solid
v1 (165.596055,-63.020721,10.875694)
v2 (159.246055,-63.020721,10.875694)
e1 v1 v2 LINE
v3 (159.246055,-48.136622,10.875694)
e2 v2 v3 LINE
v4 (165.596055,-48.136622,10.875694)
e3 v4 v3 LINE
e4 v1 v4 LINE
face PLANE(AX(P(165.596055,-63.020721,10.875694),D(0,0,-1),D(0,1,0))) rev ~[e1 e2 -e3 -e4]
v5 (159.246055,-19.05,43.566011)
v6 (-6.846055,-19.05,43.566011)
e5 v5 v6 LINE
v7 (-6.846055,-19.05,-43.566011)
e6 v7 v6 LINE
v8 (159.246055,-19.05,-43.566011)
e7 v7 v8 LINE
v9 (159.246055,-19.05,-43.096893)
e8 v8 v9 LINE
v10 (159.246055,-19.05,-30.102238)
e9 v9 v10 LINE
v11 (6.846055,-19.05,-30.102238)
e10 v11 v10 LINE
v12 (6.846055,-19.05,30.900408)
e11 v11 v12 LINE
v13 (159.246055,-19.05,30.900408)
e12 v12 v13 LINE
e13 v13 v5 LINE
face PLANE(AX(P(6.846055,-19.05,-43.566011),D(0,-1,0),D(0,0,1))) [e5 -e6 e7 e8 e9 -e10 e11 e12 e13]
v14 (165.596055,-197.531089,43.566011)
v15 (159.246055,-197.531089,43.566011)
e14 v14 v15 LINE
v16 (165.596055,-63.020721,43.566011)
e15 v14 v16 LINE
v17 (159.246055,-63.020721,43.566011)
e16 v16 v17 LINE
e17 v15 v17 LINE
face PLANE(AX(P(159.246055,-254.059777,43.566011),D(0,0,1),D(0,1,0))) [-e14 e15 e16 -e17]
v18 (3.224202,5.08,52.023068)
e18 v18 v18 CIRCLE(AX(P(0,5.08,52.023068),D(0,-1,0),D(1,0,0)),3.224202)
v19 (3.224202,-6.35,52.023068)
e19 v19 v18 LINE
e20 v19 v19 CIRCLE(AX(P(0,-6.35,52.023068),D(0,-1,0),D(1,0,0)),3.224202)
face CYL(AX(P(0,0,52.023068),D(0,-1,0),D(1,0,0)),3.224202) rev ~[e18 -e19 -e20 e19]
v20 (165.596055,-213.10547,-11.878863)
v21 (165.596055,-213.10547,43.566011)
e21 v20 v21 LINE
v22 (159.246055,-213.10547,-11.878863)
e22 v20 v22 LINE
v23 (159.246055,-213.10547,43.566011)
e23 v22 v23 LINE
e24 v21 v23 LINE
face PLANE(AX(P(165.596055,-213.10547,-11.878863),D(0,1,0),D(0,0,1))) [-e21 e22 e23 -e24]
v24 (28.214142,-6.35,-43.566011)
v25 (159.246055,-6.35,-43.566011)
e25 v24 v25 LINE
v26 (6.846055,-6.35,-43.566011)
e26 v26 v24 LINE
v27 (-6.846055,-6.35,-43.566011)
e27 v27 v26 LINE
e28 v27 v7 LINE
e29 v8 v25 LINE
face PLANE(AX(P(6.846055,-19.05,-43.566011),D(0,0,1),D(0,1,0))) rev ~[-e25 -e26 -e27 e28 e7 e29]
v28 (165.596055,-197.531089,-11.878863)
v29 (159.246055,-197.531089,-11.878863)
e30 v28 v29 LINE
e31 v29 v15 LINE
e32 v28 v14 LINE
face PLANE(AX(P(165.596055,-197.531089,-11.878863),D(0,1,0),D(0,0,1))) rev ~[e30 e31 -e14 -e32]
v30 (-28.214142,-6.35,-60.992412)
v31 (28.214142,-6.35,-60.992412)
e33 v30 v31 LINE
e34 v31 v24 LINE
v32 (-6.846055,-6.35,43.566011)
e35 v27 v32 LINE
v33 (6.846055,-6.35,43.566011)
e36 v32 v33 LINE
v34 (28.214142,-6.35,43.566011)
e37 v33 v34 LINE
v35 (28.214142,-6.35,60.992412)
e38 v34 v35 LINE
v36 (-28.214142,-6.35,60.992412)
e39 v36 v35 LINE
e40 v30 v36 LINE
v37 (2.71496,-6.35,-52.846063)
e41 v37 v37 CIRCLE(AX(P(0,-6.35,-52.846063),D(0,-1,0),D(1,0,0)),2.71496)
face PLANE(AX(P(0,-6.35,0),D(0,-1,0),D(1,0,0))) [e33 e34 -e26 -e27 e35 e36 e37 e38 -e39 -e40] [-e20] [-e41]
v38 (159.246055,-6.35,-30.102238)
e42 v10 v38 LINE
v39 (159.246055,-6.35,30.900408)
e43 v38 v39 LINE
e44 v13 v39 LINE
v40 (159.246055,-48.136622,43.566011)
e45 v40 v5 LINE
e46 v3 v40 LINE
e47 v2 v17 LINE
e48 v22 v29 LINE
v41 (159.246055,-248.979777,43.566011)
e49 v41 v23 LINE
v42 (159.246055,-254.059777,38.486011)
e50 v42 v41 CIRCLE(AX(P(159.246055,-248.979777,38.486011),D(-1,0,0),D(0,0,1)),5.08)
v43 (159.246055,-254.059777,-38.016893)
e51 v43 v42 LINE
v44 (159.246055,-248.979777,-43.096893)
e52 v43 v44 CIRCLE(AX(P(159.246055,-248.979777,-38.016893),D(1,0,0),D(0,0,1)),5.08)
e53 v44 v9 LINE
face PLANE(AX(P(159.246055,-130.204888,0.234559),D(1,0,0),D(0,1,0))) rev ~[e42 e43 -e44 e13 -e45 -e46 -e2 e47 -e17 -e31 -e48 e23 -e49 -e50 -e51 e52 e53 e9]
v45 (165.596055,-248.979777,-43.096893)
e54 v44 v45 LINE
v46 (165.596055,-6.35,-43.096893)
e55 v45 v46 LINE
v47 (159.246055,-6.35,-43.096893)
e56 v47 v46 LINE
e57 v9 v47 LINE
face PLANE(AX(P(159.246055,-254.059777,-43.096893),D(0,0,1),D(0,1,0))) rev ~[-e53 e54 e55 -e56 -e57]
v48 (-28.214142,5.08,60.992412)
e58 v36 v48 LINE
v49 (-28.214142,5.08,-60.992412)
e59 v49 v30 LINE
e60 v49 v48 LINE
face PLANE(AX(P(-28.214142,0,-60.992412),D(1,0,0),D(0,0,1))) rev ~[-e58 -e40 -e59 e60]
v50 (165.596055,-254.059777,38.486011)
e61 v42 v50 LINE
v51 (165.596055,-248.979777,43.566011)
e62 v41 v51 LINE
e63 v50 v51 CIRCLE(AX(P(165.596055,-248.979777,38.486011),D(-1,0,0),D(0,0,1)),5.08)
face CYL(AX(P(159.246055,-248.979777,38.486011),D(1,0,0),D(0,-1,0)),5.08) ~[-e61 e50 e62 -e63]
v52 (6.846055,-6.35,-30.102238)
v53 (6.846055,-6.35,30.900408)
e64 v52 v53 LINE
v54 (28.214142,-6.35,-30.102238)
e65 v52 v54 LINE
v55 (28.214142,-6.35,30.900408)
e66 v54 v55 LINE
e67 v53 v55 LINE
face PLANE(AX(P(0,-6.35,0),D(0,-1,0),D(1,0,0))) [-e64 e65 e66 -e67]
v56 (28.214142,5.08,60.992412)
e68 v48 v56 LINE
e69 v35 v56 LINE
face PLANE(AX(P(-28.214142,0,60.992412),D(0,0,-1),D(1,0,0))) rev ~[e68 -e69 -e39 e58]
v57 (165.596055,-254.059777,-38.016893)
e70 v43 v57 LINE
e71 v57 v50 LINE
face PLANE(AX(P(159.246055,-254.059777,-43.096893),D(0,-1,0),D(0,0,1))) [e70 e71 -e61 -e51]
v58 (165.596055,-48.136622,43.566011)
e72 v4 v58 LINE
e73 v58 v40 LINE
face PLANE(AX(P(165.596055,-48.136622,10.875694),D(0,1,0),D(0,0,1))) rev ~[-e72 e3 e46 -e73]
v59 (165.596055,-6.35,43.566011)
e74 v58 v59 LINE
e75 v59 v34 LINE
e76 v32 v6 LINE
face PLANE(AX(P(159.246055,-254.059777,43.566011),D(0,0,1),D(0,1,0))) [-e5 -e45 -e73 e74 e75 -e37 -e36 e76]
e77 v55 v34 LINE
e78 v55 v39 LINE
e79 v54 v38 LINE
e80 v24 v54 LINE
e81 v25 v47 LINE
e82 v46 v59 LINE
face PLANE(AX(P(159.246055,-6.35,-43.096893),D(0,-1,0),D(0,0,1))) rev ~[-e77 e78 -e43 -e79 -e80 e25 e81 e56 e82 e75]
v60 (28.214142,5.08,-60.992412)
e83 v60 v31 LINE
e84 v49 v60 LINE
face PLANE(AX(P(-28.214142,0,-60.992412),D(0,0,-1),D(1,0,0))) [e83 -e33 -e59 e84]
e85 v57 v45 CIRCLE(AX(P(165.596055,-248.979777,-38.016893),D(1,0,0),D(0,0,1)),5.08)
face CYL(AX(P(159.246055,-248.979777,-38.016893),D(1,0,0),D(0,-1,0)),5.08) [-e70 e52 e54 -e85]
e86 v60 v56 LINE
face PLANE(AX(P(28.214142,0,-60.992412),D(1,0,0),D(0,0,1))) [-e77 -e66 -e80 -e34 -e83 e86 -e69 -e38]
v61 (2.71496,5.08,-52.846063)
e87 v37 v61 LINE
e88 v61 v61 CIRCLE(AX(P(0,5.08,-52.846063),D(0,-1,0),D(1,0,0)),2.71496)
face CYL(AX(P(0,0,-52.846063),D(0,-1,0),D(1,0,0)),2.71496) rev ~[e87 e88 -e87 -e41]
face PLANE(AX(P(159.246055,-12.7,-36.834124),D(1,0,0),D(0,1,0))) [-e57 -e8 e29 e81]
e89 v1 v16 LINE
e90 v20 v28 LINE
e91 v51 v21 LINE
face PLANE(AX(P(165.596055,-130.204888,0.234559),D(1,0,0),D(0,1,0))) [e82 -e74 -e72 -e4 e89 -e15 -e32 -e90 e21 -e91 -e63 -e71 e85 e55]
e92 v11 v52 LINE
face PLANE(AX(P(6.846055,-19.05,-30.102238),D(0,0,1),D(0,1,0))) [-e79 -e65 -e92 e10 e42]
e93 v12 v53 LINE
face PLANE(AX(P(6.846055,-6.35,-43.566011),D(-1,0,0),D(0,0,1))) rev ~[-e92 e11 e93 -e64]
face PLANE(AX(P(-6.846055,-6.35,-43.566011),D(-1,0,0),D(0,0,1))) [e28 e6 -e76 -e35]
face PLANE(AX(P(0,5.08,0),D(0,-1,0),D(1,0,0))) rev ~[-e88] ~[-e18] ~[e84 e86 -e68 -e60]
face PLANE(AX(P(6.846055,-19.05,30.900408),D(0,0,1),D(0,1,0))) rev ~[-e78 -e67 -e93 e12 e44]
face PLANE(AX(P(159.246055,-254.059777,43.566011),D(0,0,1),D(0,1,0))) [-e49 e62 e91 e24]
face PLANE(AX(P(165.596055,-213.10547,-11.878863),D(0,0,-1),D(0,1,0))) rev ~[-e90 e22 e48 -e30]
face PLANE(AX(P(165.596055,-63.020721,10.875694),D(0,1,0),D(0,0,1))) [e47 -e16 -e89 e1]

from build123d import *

# Parameters (mm, degrees)
F0_W      = 56.428283453
F0_H      = 121.9848245382
F1_DEPTH  = 6.35
F2_W      = 13.6921107769
F2_H      = 87.1320217848
F3_DEPTH  = 12.7
F4_W      = 12.7
F4_H      = 12.6656033099
F5_DEPTH  = 152.4
F6_W      = 12.7
F6_H      = 13.4637728333
F7_DEPTH  = 152.4
F8_R      = 3.224201557
F8_R_2    = 2.7149600872
F9_DEPTH  = 6.351
F10_W     = 247.7097766638
F10_H     = 86.6629034281
F11_DEPTH = 6.35
F12_W     = 14.8840993643
F12_H     = 44.3546175957
F12_W_2   = 15.5743807554
F12_H_2   = 78.4596502781
F13_DEPTH = 25.4
F14_R     = 5.08
F15_DEPTH = 5.08


# Not quite as in the source:
# - the program builds the solid bodies; features that only make, move or delete a surface that nothing else refers to are left out


with BuildPart() as f1:
    # F0 (on Front) → F1 (new body)
    with BuildSketch(Plane.XZ):
        Rectangle(F0_W, F0_H)
    extrude(amount=F1_DEPTH)

    # F2 (on face) → F3 (join)
    with BuildSketch(Plane.XZ.offset(6.35)):
        Rectangle(F2_W, F2_H)
    extrude(amount=F3_DEPTH)

    # F4 (on face) → F5 (join)
    with BuildSketch(Plane.YZ.offset(6.8460553885)):
        with Locations((-12.7, 37.2332092375)):
            Rectangle(F4_W, F4_H)
    extrude(amount=F5_DEPTH)

    # F6 (on face) → F7 (join)
    with BuildSketch(Plane.YZ.offset(6.8460553885)):
        with Locations((-12.7, -36.8341244757)):
            Rectangle(F6_W, F6_H)
    extrude(amount=F7_DEPTH)

    # F8 (on face) → F9 (cut, through all)
    with BuildSketch(Plane.XZ.offset(6.35)):
        with Locations((0, 52.0230680704)):
            Circle(F8_R)
        with Locations((0, -52.8460629284)):
            Circle(F8_R_2)
    extrude(amount=-F9_DEPTH, mode=Mode.SUBTRACT)

    # F10 (on face) → F11 (join)
    with BuildSketch(Plane.YZ.offset(159.2460553885)):
        with Locations((-130.2048883319, 0.2345591784)):
            Rectangle(F10_W, F10_H)
    extrude(amount=F11_DEPTH)

    # F12 (on face) → F13 (cut)
    with BuildSketch(Plane.YZ.offset(165.5960553885)):
        with Locations((-55.5786713958, 33.0530032516)):
            Rectangle(F12_W, F12_H)
        with Locations((-205.3182795644, 27.350962162)):
            Rectangle(F12_W_2, F12_H_2)
    extrude(amount=-F13_DEPTH, mode=Mode.SUBTRACT)

    # F14
    f14_edges = [f1.edges().sort_by_distance(p)[0] for p in [
        (162.421055, -254.059777, 43.566011),
        (162.421055, -254.059777, -43.096893),
    ]]
    fillet(f14_edges, radius=F14_R)

    # F15 (add): a face of the model
    f15_faces = [f1.faces().sort_by_distance(p)[0] for p in [
        (0, 0, -0.0696069338),
    ]]
    extrude(f15_faces, amount=F15_DEPTH)


solid = f1.part
